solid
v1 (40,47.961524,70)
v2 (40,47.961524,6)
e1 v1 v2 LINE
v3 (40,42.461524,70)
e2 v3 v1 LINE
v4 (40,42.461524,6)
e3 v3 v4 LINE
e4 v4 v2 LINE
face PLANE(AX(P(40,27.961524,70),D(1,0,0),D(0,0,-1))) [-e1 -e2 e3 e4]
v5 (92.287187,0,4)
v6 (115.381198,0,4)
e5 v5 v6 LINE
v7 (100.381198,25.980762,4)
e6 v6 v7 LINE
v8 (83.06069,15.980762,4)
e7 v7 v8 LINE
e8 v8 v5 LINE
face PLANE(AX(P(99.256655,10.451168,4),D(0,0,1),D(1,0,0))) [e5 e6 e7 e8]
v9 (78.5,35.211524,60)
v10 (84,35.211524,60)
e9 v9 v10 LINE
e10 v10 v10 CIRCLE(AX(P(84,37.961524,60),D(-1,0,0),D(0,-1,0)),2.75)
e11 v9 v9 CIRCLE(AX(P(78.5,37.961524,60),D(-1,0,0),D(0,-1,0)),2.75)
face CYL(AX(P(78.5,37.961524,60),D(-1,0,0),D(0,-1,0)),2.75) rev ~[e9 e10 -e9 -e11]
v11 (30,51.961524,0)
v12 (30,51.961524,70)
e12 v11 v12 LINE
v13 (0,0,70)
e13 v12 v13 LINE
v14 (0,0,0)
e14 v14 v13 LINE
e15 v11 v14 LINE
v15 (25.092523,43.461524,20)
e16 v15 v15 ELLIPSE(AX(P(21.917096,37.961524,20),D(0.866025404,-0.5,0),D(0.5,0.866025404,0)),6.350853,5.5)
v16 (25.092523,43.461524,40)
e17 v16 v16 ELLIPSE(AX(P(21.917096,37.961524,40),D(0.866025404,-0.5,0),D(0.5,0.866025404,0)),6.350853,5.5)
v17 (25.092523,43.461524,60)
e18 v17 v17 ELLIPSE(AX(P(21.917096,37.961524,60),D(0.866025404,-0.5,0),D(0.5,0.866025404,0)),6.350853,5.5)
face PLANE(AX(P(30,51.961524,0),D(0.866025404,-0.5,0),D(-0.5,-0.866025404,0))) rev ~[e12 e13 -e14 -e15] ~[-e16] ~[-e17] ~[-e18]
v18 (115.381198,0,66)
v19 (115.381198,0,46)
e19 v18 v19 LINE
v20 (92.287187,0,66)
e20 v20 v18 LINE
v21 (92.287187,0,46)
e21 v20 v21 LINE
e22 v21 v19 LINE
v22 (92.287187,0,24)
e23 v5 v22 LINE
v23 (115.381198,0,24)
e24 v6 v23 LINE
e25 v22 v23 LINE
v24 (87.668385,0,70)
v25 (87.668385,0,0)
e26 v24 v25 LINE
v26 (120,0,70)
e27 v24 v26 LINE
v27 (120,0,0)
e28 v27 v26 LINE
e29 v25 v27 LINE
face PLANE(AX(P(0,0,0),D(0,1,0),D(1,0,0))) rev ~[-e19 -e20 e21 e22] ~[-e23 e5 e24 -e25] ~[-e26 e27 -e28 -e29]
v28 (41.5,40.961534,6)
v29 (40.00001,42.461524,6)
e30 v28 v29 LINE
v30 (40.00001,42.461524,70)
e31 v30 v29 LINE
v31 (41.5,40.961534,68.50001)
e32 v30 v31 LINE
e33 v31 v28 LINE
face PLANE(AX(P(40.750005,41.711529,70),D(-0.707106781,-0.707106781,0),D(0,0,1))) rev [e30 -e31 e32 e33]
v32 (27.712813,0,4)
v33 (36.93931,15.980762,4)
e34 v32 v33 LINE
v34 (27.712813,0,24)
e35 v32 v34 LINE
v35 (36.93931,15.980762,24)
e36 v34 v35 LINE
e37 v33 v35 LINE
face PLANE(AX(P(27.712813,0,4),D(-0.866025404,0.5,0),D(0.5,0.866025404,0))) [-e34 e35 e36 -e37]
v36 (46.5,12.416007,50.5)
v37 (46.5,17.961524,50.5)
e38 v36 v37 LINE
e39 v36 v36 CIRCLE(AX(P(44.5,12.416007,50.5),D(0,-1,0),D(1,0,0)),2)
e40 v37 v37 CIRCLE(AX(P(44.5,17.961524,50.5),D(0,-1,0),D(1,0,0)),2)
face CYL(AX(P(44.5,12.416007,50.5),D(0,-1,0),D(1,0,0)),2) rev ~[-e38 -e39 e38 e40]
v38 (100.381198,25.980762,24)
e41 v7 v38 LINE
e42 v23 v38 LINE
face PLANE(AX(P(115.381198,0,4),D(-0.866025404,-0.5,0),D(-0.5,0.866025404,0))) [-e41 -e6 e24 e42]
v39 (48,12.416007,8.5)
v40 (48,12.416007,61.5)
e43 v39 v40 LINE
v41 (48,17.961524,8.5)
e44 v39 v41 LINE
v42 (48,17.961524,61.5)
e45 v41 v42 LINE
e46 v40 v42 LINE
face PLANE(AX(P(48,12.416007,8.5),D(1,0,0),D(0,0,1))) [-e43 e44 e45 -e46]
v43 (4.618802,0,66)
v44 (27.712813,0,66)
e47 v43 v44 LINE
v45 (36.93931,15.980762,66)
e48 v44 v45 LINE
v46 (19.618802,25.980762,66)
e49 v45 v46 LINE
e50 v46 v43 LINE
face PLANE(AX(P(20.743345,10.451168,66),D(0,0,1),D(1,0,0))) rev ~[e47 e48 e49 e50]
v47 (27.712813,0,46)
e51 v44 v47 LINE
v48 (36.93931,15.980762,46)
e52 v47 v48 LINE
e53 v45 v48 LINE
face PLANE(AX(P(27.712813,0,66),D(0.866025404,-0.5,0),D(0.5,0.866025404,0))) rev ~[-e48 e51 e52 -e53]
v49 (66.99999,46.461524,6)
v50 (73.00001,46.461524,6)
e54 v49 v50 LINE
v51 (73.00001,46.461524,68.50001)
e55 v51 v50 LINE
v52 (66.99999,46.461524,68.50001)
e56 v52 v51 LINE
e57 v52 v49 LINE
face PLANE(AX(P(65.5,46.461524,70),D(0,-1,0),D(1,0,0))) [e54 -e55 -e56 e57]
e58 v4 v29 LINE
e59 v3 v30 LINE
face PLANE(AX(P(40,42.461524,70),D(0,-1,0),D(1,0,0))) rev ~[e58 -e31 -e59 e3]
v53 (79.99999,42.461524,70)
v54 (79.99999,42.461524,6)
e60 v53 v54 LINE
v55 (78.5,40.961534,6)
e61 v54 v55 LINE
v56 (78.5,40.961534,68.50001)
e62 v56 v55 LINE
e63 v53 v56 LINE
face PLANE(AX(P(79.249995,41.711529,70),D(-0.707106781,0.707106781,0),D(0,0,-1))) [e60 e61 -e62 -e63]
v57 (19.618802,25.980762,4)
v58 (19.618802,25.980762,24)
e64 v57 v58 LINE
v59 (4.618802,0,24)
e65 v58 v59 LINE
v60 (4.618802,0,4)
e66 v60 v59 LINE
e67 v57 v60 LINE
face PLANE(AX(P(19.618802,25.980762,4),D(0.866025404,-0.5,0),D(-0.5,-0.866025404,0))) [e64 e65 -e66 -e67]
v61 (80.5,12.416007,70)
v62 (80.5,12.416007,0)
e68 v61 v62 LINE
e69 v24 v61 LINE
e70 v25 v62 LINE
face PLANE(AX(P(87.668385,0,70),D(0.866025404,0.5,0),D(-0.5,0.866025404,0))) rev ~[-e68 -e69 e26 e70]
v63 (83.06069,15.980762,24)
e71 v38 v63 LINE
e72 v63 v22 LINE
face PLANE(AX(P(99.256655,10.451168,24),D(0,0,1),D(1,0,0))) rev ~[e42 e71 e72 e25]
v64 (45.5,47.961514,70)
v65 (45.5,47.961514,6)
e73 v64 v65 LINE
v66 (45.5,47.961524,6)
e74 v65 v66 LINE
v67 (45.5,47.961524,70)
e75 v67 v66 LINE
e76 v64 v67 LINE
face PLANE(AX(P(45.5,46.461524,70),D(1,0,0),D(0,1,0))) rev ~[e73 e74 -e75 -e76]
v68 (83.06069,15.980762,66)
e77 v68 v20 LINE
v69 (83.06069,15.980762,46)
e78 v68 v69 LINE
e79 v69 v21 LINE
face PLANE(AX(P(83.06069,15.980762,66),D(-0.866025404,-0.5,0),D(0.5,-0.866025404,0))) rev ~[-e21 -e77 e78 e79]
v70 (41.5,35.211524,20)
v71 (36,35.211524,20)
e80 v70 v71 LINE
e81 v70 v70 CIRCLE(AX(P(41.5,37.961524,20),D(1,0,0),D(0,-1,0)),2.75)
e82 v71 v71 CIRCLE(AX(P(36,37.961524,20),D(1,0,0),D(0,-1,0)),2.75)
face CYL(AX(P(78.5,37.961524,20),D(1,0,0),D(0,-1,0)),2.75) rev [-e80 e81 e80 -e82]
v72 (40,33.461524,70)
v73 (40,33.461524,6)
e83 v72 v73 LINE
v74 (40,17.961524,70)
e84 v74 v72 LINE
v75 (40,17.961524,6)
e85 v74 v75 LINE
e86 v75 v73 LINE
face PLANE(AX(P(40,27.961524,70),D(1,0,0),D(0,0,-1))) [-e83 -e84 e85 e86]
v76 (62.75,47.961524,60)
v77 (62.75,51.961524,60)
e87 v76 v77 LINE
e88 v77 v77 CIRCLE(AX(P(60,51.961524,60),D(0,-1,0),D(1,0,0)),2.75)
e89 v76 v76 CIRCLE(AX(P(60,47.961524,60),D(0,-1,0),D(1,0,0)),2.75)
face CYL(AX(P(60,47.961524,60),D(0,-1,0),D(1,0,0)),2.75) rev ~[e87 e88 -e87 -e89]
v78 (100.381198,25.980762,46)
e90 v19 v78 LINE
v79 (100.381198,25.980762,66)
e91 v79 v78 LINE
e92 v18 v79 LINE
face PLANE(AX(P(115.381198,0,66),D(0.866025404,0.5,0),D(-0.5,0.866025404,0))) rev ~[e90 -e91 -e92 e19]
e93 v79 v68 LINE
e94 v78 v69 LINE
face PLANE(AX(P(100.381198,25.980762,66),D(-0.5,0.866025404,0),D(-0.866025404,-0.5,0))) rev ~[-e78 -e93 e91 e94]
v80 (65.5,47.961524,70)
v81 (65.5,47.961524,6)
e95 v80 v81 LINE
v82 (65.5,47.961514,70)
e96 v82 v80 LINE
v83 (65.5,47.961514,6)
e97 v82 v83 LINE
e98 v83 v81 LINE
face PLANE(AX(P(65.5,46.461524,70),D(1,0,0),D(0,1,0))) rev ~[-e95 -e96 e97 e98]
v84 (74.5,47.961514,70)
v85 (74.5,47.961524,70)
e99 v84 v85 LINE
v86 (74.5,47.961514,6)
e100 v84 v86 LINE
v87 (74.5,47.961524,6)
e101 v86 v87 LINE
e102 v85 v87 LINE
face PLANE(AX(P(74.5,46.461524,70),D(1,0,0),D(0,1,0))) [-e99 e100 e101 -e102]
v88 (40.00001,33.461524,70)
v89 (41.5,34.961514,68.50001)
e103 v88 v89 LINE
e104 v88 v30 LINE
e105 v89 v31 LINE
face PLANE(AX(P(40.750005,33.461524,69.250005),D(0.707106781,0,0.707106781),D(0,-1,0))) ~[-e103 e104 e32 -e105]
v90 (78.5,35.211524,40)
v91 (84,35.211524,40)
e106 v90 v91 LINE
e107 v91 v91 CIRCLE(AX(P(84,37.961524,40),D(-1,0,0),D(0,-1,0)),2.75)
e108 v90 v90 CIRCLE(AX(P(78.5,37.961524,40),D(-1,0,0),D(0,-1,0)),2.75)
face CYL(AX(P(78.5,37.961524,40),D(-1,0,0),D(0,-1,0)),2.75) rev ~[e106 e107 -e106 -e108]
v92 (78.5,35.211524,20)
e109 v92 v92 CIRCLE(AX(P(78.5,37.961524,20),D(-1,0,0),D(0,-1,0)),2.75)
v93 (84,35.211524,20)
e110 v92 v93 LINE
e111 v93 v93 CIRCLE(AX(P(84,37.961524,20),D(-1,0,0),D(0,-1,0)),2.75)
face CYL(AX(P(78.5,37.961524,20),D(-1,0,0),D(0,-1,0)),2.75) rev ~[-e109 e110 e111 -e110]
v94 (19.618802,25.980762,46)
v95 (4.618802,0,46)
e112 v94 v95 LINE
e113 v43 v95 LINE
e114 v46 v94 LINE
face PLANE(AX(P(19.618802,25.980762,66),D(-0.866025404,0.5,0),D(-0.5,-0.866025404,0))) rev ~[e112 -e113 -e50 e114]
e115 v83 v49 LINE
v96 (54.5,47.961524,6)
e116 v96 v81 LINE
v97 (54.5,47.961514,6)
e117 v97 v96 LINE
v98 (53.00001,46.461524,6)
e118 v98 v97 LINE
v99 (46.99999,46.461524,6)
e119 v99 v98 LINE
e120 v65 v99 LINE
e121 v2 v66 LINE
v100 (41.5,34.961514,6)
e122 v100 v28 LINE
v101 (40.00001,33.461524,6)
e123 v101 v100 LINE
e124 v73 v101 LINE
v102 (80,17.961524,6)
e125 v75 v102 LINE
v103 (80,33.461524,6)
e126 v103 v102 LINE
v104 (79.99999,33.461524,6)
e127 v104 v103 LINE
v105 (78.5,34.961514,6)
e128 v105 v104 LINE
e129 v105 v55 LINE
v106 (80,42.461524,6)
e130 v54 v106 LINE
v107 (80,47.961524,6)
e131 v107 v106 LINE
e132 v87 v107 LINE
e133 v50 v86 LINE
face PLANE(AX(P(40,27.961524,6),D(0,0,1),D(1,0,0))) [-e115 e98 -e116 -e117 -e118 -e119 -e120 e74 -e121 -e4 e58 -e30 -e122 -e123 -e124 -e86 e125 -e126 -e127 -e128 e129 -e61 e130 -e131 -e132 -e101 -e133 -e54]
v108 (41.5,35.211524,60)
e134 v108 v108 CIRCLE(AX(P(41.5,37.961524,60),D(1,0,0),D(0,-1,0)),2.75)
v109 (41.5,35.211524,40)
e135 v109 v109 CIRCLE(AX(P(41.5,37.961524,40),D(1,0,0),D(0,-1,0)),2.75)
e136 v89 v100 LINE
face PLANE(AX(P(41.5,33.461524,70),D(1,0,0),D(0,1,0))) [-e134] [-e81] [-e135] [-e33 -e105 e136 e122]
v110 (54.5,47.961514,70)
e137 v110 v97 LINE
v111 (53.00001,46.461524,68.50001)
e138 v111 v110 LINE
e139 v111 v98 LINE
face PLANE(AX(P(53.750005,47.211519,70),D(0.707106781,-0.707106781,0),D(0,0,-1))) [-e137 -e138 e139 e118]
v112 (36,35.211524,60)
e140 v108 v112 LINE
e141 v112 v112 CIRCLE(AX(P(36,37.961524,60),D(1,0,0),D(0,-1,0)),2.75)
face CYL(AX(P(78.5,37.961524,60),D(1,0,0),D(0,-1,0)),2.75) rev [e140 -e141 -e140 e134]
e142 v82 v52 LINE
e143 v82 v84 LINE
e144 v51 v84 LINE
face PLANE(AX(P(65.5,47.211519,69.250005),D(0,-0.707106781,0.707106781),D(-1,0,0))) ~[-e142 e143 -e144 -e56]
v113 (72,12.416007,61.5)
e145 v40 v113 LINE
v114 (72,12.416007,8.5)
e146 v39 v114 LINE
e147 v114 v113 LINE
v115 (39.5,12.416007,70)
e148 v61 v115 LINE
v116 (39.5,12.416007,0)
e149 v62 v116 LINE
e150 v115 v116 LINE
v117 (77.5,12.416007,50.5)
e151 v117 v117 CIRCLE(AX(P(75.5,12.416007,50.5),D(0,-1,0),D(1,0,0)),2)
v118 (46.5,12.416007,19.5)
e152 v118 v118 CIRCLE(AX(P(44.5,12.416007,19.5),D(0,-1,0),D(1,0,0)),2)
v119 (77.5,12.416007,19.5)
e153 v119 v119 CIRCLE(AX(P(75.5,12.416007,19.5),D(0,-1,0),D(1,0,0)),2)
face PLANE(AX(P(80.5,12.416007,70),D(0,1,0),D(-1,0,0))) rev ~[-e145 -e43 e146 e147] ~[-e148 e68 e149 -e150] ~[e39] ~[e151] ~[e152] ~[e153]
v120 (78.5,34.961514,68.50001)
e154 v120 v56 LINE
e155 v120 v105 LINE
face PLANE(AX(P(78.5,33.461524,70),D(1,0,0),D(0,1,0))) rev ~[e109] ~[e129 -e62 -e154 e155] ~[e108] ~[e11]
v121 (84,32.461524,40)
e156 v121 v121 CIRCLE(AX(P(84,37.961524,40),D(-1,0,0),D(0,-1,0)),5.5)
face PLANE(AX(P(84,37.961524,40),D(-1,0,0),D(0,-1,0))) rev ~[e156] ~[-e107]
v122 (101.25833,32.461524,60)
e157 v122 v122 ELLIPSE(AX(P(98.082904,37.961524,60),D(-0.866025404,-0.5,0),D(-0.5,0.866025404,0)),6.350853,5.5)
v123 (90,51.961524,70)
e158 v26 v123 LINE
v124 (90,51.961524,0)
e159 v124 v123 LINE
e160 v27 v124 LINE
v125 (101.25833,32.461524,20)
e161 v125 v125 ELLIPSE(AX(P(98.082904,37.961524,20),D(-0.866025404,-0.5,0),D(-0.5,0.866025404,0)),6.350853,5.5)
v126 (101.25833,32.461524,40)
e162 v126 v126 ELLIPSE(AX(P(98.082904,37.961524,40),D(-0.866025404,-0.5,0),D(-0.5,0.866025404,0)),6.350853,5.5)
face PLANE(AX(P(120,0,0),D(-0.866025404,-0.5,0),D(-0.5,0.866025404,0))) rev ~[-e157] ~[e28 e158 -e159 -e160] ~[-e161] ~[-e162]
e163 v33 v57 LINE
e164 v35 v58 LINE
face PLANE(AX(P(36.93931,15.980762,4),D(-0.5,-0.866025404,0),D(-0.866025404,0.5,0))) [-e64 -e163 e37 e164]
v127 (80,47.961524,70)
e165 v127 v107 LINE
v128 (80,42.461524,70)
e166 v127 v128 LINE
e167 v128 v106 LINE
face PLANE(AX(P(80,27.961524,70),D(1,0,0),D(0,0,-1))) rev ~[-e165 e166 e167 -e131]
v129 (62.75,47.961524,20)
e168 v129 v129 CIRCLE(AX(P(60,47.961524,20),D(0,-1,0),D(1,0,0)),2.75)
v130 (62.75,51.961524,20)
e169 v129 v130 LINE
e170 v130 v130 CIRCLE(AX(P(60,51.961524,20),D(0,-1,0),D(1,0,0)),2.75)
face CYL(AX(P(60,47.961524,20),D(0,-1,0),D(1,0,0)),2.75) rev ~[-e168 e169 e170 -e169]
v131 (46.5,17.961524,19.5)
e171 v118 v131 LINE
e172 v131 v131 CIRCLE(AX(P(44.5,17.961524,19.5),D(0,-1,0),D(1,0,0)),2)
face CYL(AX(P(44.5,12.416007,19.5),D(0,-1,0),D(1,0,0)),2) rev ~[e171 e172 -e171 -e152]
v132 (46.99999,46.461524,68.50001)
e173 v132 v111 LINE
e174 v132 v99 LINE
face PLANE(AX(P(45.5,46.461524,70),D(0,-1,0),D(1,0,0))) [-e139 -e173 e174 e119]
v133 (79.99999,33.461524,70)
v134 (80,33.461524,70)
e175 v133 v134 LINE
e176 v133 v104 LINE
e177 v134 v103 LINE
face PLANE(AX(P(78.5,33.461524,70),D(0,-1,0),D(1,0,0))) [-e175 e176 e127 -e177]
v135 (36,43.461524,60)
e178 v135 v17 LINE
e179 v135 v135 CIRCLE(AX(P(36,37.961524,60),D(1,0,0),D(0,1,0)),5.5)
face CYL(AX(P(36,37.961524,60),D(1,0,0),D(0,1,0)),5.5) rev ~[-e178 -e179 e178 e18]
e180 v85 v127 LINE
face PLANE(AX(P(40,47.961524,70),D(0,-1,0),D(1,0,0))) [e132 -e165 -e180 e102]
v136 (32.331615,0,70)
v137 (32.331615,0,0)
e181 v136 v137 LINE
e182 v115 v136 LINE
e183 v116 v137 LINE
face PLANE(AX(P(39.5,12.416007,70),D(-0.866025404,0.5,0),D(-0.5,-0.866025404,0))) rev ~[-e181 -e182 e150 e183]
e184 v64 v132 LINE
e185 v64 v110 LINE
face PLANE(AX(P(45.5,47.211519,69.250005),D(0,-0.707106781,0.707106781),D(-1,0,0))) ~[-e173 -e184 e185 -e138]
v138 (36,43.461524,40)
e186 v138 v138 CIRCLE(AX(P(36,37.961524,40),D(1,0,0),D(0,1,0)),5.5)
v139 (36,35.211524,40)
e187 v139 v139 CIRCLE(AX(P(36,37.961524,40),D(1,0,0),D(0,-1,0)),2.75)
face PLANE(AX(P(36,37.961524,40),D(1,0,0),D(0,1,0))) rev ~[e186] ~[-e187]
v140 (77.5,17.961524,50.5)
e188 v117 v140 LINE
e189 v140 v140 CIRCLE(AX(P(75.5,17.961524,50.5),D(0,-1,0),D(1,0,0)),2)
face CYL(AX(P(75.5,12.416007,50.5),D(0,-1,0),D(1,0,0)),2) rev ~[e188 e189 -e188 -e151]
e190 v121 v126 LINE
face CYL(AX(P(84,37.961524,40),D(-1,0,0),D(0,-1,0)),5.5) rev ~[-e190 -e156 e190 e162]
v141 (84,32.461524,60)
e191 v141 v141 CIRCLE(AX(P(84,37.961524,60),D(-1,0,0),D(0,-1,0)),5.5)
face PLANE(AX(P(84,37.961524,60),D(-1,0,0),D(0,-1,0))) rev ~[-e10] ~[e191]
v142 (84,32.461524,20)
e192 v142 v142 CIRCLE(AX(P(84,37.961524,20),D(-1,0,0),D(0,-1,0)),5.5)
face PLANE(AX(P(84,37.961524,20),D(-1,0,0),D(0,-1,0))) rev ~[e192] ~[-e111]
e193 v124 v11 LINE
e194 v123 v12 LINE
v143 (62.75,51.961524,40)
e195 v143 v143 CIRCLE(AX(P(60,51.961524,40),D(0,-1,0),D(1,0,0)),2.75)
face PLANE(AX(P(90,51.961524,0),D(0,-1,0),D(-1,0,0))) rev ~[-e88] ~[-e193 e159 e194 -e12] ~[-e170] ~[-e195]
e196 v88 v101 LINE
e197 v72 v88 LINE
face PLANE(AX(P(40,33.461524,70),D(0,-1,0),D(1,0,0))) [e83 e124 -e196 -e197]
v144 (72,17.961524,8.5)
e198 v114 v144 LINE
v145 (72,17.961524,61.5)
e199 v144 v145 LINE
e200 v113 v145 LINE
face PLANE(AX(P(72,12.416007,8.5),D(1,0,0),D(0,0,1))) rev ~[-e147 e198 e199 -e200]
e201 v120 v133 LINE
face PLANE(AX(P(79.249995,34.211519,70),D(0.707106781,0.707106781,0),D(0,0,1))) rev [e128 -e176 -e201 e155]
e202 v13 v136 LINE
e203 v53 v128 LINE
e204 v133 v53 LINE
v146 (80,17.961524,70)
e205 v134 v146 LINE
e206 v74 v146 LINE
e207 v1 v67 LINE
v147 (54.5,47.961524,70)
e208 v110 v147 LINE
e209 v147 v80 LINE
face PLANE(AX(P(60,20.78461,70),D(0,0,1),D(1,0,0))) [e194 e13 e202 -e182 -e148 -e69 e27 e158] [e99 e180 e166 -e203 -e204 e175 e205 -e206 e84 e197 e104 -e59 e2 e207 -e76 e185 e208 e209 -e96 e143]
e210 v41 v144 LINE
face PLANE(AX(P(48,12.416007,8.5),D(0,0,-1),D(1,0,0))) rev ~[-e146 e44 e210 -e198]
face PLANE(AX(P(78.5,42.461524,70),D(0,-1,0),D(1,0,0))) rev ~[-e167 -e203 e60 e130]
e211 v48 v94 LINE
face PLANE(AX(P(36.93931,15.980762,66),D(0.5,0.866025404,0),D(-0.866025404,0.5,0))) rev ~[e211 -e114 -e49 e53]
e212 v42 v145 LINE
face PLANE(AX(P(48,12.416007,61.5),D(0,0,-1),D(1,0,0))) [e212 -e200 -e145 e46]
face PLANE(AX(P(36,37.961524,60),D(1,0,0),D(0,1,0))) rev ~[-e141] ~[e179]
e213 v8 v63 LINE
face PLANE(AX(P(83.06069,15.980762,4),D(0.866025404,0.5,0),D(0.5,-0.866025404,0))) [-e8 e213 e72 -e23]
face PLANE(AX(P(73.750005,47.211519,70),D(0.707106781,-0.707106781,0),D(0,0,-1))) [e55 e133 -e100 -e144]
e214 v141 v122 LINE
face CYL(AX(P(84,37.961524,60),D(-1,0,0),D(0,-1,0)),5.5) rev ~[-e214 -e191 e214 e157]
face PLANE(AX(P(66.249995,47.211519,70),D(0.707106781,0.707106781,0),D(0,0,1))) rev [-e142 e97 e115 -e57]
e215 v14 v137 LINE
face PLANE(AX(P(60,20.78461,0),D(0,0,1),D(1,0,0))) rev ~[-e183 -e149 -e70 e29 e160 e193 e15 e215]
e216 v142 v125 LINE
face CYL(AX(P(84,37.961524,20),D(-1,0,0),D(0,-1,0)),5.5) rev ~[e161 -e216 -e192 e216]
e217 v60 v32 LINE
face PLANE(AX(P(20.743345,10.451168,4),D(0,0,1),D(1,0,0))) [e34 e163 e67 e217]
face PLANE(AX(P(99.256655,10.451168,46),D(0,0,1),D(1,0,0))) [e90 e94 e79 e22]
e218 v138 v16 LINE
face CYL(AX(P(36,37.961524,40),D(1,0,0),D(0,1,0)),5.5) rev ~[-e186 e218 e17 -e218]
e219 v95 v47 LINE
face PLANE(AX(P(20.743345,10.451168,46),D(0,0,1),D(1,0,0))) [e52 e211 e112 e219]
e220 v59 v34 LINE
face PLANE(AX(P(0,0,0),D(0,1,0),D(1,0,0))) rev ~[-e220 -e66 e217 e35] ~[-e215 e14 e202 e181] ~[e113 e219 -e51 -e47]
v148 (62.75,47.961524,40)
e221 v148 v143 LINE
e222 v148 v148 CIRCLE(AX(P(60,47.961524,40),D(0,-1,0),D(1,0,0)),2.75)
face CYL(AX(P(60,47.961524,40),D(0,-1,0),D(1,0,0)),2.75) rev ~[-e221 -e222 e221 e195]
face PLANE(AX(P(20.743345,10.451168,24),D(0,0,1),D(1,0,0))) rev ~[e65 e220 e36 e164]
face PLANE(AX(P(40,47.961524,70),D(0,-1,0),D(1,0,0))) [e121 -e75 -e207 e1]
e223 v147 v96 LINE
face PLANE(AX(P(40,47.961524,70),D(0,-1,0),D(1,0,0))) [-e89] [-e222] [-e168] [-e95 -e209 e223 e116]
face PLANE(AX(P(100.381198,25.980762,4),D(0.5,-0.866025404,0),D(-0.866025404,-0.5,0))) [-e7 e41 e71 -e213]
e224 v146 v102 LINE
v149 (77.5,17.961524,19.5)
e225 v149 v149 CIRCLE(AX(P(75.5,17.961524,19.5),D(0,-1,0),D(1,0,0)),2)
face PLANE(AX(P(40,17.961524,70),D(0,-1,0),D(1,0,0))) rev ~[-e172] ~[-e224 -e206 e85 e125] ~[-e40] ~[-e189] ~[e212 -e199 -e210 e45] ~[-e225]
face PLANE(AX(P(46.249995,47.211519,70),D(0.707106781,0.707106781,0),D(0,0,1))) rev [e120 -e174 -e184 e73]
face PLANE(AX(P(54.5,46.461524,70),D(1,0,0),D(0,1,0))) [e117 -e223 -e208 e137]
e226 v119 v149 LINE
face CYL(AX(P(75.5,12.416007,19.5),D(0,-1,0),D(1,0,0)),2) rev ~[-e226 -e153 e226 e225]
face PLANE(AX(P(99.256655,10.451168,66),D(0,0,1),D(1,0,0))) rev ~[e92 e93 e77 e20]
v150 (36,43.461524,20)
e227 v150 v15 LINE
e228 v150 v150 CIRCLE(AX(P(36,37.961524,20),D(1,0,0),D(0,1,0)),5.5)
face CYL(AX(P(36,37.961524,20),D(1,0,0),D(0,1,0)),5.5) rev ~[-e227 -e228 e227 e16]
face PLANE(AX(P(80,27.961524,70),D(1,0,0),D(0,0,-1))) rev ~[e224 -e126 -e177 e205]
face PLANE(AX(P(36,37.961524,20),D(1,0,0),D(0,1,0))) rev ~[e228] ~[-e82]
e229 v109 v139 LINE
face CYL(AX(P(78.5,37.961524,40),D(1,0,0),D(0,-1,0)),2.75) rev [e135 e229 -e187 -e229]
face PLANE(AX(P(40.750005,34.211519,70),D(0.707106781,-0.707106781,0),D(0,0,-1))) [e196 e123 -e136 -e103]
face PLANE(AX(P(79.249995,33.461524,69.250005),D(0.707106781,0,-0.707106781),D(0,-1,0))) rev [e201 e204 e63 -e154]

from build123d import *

# Parameters (mm, degrees)
F1_DEPTH       = 70
F2_W           = 40
F2_H           = 20
F3_DEPTH       = 64
F6_DEPTH       = 20
F9_DEPTH       = 20
F11_DEPTH      = 70.001
F12_W          = 24
F12_H          = 53
F13_DEPTH      = 15.5455173281
F14_R          = 2
F15_DEPTH      = 15.5455173281
F16_DEPTH      = 10
F17_W          = 1.5
F17_H          = 9
F17_W_2        = 9
F17_H_2        = 1.5
F18_DEPTH      = 64
F19_SIZE       = 1.49999
F20_R          = 2.75
F21_DEPTH      = 41.501
F21_DEPTH_BACK = 78.501
F24_R          = 5.5
F25_DEPTH      = 36.001
F26_R          = 5.5
F27_DEPTH      = 36.001
F28_R          = 2.75
F29_DEPTH      = 4.001


# Not quite as in the source:
# - a fillet or chamfer is up to 0.001 mm smaller than in the source, because OpenCascade refuses the exact size


with BuildPart() as f1:
    # F0 (on Top) → F1 (new body)
    with BuildSketch(Plane.XY):
        Polygon((30, 51.9615242271), (0, 0), (120, 0), (90, 51.9615242271), align=None)
    extrude(amount=F1_DEPTH)

    # F2 (on face) → F3 (cut)
    with BuildSketch(Plane.XY.offset(70)):
        with Locations((60, 37.9615242271)):
            Rectangle(F2_W, F2_H)
    extrude(amount=-F3_DEPTH, mode=Mode.SUBTRACT)

    # F5 (on offset) → F6 (cut)
    with BuildSketch(Plane.XY.offset(4)):
        Polygon((19.6188021535, 25.9807621135), (4.6188021535, 0), (27.7128129211, 0), (36.9393102292, 15.9807621135), align=None)
        Polygon((100.3811978465, 25.9807621135), (83.0606897708, 15.9807621135), (92.2871870789, 0), (115.3811978465, 0), align=None)
    extrude(amount=F6_DEPTH, mode=Mode.SUBTRACT)

    # F8 (on offset) → F9 (cut)
    with BuildSketch(Plane.XY.offset(66)):
        Polygon((19.6188021535, 25.9807621135), (4.6188021535, 0), (27.7128129211, 0), (36.9393102292, 15.9807621135), align=None)
        Polygon((100.3811978465, 25.9807621135), (83.0606897708, 15.9807621135), (92.2871870789, 0), (115.3811978465, 0), align=None)
    extrude(amount=-F9_DEPTH, mode=Mode.SUBTRACT)

    # F10 (on face) → F11 (cut, through all)
    with BuildSketch(Plane.XY.offset(70)):
        Polygon((39.5, 12.416006899), (32.3316150746, 0), (87.6683849254, 0), (80.5, 12.416006899), align=None)
    extrude(amount=-F11_DEPTH, mode=Mode.SUBTRACT)

    # F12 (on face) → F13 (cut, through all)
    with BuildSketch(Plane.XZ.offset(-12.416006899)):
        with Locations((60, 35)):
            Rectangle(F12_W, F12_H)
    extrude(amount=-F13_DEPTH, mode=Mode.SUBTRACT)

    # F14 (on face) → F15 (cut, through all)
    with BuildSketch(Plane.XZ.offset(-12.416006899)):
        with Locations((44.5, 50.5)):
            Circle(F14_R)
        with Locations((44.5, 19.5)):
            Circle(F14_R)
        with Locations((75.5, 19.5)):
            Circle(F14_R)
        with Locations((75.5, 50.5)):
            Circle(F14_R)
    extrude(amount=-F15_DEPTH, mode=Mode.SUBTRACT)

    # F16 (cut): a face of the model
    f16_faces = [f1.faces().sort_by_distance(p)[0] for p in [
        (40.7547184906, 27.9615242271, 38),
    ]]
    extrude(f16_faces, amount=-F16_DEPTH, mode=Mode.SUBTRACT)

    # F17 (on face) → F18 (join, through all)
    with BuildSketch(Plane.XY.offset(70)):
        with Locations((40.75, 37.9615242271)):
            Rectangle(F17_W, F17_H)
        with Locations((50, 47.2115242271)):
            Rectangle(F17_W_2, F17_H_2)
        with Locations((79.25, 37.9615242271)):
            Rectangle(F17_W, F17_H)
        with Locations((70, 47.2115242271)):
            Rectangle(F17_W_2, F17_H_2)
    extrude(amount=-F18_DEPTH)

    # F19 (size 1.5 in the source; OpenCascade refuses exactly that, so slightly less here)
    f19_edges = [f1.edges().sort_by_distance(p)[0] for p in [
        (54.5, 46.461524, 38),
        (45.5, 46.461524, 38),
        (50, 46.461524, 70),
        (41.5, 37.961524, 70),
        (41.5, 33.461524, 38),
        (65.5, 46.461524, 38),
        (74.5, 46.461524, 38),
        (78.5, 33.461524, 38),
        (78.5, 42.461524, 38),
        (70, 46.461524, 70),
        (78.5, 37.961524, 70),
        (41.5, 42.461524, 38),
    ]]
    chamfer(f19_edges, length=F19_SIZE)

    # F20 (on face) → F21 (cut, two sides)
    with BuildSketch(Plane(origin=(78.5, 0, 0), x_dir=(0, -1, 0), z_dir=(-1, 0, 0))) as f21_sk:
        with Locations((-37.9615242271, 60)):
            Circle(F20_R)
        with Locations((-37.9615242271, 40)):
            Circle(F20_R)
        with Locations((-37.9615242271, 20)):
            Circle(F20_R)
    extrude(amount=-F21_DEPTH, mode=Mode.SUBTRACT)
    extrude(f21_sk.sketch, amount=F21_DEPTH_BACK, mode=Mode.SUBTRACT)

    # F24 (on offset) → F25 (cut, through all)
    with BuildSketch(Plane(origin=(84, 0, 0), x_dir=(0, -1, 0), z_dir=(-1, 0, 0))):
        with Locations((-37.9615242271, 60)):
            Circle(F24_R)
        with Locations((-37.9615242271, 40)):
            Circle(F24_R)
        with Locations((-37.9615242271, 20)):
            Circle(F24_R)
    extrude(amount=-F25_DEPTH, mode=Mode.SUBTRACT)

    # F26 (on offset) → F27 (cut, through all)
    with BuildSketch(Plane.YZ.offset(36)):
        with Locations((37.9615242271, 60)):
            Circle(F26_R)
        with Locations((37.9615242271, 40)):
            Circle(F26_R)
        with Locations((37.9615242271, 20)):
            Circle(F26_R)
    extrude(amount=-F27_DEPTH, mode=Mode.SUBTRACT)

    # F28 (on face) → F29 (cut, through all)
    with BuildSketch(Plane.XZ.offset(-47.9615242271)):
        with Locations((60, 60)):
            Circle(F28_R)
        with Locations((60, 40)):
            Circle(F28_R)
        with Locations((60, 20)):
            Circle(F28_R)
    extrude(amount=-F29_DEPTH, mode=Mode.SUBTRACT)


solid = f1.part
